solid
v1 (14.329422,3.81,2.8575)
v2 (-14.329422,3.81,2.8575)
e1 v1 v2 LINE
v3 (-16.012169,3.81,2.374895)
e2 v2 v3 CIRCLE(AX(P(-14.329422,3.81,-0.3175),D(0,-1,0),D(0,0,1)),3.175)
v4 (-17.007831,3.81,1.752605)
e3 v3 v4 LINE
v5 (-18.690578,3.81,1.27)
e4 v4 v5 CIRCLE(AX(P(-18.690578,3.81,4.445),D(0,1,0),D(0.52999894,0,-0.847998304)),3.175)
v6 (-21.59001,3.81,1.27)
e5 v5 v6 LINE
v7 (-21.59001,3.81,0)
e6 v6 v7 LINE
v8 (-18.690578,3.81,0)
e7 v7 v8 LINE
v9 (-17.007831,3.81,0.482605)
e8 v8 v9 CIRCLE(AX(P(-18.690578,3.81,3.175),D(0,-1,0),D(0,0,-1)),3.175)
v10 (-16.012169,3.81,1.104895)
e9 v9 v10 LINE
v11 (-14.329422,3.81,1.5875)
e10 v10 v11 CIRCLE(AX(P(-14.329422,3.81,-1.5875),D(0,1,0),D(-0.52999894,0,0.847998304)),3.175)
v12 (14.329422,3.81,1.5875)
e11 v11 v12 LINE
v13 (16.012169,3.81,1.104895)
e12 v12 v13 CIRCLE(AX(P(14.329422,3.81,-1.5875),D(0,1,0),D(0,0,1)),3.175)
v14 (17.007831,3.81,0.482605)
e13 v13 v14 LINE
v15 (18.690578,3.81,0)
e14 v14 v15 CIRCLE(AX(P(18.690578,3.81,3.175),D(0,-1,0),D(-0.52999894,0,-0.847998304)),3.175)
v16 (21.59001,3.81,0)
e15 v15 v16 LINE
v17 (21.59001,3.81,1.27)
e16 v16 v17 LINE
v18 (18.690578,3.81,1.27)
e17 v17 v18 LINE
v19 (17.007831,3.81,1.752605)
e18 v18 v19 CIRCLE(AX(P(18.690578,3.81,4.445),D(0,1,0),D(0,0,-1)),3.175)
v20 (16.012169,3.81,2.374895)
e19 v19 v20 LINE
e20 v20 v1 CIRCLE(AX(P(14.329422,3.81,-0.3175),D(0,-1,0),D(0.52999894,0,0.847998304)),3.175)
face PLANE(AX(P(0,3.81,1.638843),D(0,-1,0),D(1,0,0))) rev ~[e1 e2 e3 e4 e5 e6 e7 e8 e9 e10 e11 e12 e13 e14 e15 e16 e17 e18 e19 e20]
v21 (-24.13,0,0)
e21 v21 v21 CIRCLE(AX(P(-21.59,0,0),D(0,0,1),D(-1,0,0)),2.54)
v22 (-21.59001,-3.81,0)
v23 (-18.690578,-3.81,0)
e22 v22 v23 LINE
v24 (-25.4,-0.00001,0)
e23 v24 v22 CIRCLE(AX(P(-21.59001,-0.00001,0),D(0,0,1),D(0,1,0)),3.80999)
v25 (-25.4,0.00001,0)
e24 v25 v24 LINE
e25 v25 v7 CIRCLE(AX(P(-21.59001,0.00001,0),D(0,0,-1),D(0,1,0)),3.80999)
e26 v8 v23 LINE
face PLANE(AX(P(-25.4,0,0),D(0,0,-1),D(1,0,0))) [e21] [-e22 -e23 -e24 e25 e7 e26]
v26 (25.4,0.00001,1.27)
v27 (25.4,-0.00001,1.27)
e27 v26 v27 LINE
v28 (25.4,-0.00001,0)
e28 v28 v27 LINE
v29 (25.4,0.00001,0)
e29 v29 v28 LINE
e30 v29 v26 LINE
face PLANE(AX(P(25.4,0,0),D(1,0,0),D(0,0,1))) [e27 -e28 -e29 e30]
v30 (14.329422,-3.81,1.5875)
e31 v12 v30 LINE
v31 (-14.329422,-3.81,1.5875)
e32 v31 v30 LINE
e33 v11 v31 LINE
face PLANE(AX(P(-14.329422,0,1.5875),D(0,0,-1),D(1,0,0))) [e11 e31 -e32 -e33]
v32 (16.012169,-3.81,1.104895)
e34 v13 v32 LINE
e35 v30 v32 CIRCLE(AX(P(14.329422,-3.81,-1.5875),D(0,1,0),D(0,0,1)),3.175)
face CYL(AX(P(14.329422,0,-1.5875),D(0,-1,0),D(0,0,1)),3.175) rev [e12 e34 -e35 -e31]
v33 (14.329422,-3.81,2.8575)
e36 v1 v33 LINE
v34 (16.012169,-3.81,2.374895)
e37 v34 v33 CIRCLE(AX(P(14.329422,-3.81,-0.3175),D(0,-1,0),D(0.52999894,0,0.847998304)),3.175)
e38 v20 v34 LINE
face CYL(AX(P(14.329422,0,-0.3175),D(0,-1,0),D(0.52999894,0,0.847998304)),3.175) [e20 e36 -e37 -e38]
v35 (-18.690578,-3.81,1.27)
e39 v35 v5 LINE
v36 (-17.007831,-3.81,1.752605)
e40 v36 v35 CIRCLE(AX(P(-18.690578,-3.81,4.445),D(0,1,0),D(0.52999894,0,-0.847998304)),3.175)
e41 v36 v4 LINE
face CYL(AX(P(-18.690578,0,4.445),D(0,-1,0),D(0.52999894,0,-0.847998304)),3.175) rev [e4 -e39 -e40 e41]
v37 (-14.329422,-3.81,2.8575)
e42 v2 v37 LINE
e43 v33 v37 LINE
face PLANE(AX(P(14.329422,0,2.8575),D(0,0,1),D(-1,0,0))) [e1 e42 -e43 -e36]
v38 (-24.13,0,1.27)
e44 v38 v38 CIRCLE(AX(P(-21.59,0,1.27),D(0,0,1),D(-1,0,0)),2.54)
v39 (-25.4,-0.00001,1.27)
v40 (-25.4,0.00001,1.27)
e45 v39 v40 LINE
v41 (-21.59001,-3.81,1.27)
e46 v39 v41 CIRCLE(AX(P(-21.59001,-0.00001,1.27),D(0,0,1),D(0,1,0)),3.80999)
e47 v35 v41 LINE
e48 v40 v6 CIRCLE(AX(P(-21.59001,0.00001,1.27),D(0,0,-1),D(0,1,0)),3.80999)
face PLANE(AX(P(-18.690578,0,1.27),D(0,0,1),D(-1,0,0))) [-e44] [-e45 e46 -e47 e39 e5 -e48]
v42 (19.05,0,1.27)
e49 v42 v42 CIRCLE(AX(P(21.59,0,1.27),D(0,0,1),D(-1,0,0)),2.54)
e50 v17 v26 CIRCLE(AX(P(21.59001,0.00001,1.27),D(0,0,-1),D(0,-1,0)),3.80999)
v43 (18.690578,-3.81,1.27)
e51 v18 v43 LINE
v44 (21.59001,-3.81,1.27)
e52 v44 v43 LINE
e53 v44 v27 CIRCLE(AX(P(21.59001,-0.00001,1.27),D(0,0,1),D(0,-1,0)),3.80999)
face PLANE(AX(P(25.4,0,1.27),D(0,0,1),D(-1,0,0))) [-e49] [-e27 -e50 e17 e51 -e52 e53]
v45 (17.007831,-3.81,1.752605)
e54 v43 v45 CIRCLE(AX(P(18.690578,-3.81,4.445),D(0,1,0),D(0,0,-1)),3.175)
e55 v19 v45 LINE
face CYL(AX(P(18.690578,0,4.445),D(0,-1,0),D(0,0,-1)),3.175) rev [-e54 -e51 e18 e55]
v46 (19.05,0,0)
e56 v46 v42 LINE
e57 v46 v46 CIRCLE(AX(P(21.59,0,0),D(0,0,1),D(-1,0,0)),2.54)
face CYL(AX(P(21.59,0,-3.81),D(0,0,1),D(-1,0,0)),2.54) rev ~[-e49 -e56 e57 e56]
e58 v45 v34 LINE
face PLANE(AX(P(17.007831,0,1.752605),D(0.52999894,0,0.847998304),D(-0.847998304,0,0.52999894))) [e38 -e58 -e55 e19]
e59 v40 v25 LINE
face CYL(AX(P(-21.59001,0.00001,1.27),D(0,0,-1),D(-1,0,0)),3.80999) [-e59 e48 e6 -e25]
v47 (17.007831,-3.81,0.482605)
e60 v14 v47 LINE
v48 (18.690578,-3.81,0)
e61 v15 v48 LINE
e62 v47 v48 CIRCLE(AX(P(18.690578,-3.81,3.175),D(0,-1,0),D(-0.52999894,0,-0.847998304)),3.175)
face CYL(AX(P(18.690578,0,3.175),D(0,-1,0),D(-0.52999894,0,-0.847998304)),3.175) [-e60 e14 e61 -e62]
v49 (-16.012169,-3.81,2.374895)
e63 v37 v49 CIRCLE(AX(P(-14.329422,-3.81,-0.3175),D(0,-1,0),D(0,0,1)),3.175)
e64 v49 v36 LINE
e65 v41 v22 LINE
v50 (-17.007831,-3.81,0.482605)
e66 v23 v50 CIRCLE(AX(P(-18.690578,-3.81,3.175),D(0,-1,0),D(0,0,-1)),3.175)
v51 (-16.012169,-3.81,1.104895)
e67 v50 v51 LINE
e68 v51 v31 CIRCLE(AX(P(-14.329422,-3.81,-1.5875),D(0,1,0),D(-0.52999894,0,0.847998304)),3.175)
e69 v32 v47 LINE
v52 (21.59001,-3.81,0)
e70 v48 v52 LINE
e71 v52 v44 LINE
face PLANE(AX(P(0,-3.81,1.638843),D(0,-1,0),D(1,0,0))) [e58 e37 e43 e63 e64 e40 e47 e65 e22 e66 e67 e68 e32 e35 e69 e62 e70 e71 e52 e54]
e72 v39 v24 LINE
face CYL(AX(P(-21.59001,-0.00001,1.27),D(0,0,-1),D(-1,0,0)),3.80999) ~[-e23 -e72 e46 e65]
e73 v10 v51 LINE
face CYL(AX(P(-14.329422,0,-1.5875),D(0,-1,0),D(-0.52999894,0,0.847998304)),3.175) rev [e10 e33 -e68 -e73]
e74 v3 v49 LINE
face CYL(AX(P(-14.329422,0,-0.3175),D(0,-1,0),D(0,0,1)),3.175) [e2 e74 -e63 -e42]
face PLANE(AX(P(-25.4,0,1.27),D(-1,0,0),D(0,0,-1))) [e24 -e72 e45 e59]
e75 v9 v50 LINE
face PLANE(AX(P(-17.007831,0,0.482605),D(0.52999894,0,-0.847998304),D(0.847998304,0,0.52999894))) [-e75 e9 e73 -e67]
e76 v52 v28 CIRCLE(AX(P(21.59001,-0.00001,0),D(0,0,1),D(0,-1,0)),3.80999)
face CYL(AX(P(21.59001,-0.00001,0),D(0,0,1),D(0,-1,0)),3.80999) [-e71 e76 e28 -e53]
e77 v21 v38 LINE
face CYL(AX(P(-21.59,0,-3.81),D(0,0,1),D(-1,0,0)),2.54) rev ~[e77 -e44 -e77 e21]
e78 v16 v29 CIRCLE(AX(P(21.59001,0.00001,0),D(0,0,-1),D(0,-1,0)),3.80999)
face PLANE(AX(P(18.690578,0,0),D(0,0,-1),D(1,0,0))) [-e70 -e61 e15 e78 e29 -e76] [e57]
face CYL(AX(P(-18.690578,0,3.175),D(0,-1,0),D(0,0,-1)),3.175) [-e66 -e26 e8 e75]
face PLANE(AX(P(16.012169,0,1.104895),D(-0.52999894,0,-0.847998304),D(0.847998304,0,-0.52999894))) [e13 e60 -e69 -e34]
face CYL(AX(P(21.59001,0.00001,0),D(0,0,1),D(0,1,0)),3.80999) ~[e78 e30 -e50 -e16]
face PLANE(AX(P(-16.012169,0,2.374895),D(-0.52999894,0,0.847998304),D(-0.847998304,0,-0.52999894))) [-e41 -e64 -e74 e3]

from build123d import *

# Parameters (mm, degrees)
F2_DEPTH = 3.81
F3_D     = 5.08
F3_DEPTH = 3.81
F3_TIP   = 1.5261859723
F4_R     = 3.80999


# Not quite as in the source:
# - a fillet or chamfer is up to 0.001 mm smaller than in the source, because OpenCascade refuses the exact size


with BuildPart() as f2:
    # F1 (on Front) → F2 (new body, symmetric)
    with BuildSketch(Plane.XZ):
        with BuildLine():
            Line((-25.4, 1.27), (-25.4, 0))
            Line((-25.4, 0), (-18.6905780189, 0))
            ThreePointArc((-18.6905780189, 0), (-17.8152860399, 0.1230352309), (-17.0078313843, 0.4826053848))
            Line((-17.0078313843, 0.4826053848), (-16.0121686157, 1.1048946152))
            ThreePointArc((-16.0121686157, 1.1048946152), (-15.2047139601, 1.4644647691), (-14.3294219811, 1.5875))
            Line((-14.3294219811, 1.5875), (14.3294219811, 1.5875))
            ThreePointArc((14.3294219811, 1.5875), (15.2047139601, 1.4644647691), (16.0121686157, 1.1048946152))
            Line((16.0121686157, 1.1048946152), (17.0078313843, 0.4826053848))
            ThreePointArc((17.0078313843, 0.4826053848), (17.8152860399, 0.1230352309), (18.6905780189, 0))
            Line((18.6905780189, 0), (25.4, 0))
            Line((25.4, 0), (25.4, 1.27))
            Line((25.4, 1.27), (18.6905780189, 1.27))
            ThreePointArc((18.6905780189, 1.27), (17.8152860399, 1.3930352309), (17.0078313843, 1.7526053848))
            Line((17.0078313843, 1.7526053848), (16.0121686157, 2.3748946152))
            ThreePointArc((16.0121686157, 2.3748946152), (15.2047139601, 2.7344647691), (14.3294219811, 2.8575))
            Line((14.3294219811, 2.8575), (-14.3294219811, 2.8575))
            ThreePointArc((-14.3294219811, 2.8575), (-15.2047139601, 2.7344647691), (-16.0121686157, 2.3748946152))
            Line((-16.0121686157, 2.3748946152), (-17.0078313843, 1.7526053848))
            ThreePointArc((-17.0078313843, 1.7526053848), (-17.8152860399, 1.3930352309), (-18.6905780189, 1.27))
            Line((-18.6905780189, 1.27), (-25.4, 1.27))
        make_face()
    extrude(amount=F2_DEPTH, both=True)

    # F3
    with Locations(Plane(origin=(0, 0, 0), x_dir=(1, 0, 0), z_dir=(0, 0, -1))):
        with Locations((-21.59, 0), (21.59, 0)):
            Hole(F3_D / 2, depth=F3_DEPTH)
            with Locations((0, 0, -(F3_DEPTH + F3_TIP / 2))):  # 118° drill point
                Cone(0, F3_D / 2, F3_TIP, mode=Mode.SUBTRACT)

    # F4 (radius 3.81 in the source; OpenCascade refuses exactly that, so slightly less here)
    f4_edges = [f2.edges().sort_by_distance(p)[0] for p in [
        (-25.4, -3.81, 0.635),
        (-25.4, 3.81, 0.635),
        (25.4, -3.81, 0.635),
        (25.4, 3.81, 0.635),
    ]]
    fillet(f4_edges, radius=F4_R)


solid = f2.part
